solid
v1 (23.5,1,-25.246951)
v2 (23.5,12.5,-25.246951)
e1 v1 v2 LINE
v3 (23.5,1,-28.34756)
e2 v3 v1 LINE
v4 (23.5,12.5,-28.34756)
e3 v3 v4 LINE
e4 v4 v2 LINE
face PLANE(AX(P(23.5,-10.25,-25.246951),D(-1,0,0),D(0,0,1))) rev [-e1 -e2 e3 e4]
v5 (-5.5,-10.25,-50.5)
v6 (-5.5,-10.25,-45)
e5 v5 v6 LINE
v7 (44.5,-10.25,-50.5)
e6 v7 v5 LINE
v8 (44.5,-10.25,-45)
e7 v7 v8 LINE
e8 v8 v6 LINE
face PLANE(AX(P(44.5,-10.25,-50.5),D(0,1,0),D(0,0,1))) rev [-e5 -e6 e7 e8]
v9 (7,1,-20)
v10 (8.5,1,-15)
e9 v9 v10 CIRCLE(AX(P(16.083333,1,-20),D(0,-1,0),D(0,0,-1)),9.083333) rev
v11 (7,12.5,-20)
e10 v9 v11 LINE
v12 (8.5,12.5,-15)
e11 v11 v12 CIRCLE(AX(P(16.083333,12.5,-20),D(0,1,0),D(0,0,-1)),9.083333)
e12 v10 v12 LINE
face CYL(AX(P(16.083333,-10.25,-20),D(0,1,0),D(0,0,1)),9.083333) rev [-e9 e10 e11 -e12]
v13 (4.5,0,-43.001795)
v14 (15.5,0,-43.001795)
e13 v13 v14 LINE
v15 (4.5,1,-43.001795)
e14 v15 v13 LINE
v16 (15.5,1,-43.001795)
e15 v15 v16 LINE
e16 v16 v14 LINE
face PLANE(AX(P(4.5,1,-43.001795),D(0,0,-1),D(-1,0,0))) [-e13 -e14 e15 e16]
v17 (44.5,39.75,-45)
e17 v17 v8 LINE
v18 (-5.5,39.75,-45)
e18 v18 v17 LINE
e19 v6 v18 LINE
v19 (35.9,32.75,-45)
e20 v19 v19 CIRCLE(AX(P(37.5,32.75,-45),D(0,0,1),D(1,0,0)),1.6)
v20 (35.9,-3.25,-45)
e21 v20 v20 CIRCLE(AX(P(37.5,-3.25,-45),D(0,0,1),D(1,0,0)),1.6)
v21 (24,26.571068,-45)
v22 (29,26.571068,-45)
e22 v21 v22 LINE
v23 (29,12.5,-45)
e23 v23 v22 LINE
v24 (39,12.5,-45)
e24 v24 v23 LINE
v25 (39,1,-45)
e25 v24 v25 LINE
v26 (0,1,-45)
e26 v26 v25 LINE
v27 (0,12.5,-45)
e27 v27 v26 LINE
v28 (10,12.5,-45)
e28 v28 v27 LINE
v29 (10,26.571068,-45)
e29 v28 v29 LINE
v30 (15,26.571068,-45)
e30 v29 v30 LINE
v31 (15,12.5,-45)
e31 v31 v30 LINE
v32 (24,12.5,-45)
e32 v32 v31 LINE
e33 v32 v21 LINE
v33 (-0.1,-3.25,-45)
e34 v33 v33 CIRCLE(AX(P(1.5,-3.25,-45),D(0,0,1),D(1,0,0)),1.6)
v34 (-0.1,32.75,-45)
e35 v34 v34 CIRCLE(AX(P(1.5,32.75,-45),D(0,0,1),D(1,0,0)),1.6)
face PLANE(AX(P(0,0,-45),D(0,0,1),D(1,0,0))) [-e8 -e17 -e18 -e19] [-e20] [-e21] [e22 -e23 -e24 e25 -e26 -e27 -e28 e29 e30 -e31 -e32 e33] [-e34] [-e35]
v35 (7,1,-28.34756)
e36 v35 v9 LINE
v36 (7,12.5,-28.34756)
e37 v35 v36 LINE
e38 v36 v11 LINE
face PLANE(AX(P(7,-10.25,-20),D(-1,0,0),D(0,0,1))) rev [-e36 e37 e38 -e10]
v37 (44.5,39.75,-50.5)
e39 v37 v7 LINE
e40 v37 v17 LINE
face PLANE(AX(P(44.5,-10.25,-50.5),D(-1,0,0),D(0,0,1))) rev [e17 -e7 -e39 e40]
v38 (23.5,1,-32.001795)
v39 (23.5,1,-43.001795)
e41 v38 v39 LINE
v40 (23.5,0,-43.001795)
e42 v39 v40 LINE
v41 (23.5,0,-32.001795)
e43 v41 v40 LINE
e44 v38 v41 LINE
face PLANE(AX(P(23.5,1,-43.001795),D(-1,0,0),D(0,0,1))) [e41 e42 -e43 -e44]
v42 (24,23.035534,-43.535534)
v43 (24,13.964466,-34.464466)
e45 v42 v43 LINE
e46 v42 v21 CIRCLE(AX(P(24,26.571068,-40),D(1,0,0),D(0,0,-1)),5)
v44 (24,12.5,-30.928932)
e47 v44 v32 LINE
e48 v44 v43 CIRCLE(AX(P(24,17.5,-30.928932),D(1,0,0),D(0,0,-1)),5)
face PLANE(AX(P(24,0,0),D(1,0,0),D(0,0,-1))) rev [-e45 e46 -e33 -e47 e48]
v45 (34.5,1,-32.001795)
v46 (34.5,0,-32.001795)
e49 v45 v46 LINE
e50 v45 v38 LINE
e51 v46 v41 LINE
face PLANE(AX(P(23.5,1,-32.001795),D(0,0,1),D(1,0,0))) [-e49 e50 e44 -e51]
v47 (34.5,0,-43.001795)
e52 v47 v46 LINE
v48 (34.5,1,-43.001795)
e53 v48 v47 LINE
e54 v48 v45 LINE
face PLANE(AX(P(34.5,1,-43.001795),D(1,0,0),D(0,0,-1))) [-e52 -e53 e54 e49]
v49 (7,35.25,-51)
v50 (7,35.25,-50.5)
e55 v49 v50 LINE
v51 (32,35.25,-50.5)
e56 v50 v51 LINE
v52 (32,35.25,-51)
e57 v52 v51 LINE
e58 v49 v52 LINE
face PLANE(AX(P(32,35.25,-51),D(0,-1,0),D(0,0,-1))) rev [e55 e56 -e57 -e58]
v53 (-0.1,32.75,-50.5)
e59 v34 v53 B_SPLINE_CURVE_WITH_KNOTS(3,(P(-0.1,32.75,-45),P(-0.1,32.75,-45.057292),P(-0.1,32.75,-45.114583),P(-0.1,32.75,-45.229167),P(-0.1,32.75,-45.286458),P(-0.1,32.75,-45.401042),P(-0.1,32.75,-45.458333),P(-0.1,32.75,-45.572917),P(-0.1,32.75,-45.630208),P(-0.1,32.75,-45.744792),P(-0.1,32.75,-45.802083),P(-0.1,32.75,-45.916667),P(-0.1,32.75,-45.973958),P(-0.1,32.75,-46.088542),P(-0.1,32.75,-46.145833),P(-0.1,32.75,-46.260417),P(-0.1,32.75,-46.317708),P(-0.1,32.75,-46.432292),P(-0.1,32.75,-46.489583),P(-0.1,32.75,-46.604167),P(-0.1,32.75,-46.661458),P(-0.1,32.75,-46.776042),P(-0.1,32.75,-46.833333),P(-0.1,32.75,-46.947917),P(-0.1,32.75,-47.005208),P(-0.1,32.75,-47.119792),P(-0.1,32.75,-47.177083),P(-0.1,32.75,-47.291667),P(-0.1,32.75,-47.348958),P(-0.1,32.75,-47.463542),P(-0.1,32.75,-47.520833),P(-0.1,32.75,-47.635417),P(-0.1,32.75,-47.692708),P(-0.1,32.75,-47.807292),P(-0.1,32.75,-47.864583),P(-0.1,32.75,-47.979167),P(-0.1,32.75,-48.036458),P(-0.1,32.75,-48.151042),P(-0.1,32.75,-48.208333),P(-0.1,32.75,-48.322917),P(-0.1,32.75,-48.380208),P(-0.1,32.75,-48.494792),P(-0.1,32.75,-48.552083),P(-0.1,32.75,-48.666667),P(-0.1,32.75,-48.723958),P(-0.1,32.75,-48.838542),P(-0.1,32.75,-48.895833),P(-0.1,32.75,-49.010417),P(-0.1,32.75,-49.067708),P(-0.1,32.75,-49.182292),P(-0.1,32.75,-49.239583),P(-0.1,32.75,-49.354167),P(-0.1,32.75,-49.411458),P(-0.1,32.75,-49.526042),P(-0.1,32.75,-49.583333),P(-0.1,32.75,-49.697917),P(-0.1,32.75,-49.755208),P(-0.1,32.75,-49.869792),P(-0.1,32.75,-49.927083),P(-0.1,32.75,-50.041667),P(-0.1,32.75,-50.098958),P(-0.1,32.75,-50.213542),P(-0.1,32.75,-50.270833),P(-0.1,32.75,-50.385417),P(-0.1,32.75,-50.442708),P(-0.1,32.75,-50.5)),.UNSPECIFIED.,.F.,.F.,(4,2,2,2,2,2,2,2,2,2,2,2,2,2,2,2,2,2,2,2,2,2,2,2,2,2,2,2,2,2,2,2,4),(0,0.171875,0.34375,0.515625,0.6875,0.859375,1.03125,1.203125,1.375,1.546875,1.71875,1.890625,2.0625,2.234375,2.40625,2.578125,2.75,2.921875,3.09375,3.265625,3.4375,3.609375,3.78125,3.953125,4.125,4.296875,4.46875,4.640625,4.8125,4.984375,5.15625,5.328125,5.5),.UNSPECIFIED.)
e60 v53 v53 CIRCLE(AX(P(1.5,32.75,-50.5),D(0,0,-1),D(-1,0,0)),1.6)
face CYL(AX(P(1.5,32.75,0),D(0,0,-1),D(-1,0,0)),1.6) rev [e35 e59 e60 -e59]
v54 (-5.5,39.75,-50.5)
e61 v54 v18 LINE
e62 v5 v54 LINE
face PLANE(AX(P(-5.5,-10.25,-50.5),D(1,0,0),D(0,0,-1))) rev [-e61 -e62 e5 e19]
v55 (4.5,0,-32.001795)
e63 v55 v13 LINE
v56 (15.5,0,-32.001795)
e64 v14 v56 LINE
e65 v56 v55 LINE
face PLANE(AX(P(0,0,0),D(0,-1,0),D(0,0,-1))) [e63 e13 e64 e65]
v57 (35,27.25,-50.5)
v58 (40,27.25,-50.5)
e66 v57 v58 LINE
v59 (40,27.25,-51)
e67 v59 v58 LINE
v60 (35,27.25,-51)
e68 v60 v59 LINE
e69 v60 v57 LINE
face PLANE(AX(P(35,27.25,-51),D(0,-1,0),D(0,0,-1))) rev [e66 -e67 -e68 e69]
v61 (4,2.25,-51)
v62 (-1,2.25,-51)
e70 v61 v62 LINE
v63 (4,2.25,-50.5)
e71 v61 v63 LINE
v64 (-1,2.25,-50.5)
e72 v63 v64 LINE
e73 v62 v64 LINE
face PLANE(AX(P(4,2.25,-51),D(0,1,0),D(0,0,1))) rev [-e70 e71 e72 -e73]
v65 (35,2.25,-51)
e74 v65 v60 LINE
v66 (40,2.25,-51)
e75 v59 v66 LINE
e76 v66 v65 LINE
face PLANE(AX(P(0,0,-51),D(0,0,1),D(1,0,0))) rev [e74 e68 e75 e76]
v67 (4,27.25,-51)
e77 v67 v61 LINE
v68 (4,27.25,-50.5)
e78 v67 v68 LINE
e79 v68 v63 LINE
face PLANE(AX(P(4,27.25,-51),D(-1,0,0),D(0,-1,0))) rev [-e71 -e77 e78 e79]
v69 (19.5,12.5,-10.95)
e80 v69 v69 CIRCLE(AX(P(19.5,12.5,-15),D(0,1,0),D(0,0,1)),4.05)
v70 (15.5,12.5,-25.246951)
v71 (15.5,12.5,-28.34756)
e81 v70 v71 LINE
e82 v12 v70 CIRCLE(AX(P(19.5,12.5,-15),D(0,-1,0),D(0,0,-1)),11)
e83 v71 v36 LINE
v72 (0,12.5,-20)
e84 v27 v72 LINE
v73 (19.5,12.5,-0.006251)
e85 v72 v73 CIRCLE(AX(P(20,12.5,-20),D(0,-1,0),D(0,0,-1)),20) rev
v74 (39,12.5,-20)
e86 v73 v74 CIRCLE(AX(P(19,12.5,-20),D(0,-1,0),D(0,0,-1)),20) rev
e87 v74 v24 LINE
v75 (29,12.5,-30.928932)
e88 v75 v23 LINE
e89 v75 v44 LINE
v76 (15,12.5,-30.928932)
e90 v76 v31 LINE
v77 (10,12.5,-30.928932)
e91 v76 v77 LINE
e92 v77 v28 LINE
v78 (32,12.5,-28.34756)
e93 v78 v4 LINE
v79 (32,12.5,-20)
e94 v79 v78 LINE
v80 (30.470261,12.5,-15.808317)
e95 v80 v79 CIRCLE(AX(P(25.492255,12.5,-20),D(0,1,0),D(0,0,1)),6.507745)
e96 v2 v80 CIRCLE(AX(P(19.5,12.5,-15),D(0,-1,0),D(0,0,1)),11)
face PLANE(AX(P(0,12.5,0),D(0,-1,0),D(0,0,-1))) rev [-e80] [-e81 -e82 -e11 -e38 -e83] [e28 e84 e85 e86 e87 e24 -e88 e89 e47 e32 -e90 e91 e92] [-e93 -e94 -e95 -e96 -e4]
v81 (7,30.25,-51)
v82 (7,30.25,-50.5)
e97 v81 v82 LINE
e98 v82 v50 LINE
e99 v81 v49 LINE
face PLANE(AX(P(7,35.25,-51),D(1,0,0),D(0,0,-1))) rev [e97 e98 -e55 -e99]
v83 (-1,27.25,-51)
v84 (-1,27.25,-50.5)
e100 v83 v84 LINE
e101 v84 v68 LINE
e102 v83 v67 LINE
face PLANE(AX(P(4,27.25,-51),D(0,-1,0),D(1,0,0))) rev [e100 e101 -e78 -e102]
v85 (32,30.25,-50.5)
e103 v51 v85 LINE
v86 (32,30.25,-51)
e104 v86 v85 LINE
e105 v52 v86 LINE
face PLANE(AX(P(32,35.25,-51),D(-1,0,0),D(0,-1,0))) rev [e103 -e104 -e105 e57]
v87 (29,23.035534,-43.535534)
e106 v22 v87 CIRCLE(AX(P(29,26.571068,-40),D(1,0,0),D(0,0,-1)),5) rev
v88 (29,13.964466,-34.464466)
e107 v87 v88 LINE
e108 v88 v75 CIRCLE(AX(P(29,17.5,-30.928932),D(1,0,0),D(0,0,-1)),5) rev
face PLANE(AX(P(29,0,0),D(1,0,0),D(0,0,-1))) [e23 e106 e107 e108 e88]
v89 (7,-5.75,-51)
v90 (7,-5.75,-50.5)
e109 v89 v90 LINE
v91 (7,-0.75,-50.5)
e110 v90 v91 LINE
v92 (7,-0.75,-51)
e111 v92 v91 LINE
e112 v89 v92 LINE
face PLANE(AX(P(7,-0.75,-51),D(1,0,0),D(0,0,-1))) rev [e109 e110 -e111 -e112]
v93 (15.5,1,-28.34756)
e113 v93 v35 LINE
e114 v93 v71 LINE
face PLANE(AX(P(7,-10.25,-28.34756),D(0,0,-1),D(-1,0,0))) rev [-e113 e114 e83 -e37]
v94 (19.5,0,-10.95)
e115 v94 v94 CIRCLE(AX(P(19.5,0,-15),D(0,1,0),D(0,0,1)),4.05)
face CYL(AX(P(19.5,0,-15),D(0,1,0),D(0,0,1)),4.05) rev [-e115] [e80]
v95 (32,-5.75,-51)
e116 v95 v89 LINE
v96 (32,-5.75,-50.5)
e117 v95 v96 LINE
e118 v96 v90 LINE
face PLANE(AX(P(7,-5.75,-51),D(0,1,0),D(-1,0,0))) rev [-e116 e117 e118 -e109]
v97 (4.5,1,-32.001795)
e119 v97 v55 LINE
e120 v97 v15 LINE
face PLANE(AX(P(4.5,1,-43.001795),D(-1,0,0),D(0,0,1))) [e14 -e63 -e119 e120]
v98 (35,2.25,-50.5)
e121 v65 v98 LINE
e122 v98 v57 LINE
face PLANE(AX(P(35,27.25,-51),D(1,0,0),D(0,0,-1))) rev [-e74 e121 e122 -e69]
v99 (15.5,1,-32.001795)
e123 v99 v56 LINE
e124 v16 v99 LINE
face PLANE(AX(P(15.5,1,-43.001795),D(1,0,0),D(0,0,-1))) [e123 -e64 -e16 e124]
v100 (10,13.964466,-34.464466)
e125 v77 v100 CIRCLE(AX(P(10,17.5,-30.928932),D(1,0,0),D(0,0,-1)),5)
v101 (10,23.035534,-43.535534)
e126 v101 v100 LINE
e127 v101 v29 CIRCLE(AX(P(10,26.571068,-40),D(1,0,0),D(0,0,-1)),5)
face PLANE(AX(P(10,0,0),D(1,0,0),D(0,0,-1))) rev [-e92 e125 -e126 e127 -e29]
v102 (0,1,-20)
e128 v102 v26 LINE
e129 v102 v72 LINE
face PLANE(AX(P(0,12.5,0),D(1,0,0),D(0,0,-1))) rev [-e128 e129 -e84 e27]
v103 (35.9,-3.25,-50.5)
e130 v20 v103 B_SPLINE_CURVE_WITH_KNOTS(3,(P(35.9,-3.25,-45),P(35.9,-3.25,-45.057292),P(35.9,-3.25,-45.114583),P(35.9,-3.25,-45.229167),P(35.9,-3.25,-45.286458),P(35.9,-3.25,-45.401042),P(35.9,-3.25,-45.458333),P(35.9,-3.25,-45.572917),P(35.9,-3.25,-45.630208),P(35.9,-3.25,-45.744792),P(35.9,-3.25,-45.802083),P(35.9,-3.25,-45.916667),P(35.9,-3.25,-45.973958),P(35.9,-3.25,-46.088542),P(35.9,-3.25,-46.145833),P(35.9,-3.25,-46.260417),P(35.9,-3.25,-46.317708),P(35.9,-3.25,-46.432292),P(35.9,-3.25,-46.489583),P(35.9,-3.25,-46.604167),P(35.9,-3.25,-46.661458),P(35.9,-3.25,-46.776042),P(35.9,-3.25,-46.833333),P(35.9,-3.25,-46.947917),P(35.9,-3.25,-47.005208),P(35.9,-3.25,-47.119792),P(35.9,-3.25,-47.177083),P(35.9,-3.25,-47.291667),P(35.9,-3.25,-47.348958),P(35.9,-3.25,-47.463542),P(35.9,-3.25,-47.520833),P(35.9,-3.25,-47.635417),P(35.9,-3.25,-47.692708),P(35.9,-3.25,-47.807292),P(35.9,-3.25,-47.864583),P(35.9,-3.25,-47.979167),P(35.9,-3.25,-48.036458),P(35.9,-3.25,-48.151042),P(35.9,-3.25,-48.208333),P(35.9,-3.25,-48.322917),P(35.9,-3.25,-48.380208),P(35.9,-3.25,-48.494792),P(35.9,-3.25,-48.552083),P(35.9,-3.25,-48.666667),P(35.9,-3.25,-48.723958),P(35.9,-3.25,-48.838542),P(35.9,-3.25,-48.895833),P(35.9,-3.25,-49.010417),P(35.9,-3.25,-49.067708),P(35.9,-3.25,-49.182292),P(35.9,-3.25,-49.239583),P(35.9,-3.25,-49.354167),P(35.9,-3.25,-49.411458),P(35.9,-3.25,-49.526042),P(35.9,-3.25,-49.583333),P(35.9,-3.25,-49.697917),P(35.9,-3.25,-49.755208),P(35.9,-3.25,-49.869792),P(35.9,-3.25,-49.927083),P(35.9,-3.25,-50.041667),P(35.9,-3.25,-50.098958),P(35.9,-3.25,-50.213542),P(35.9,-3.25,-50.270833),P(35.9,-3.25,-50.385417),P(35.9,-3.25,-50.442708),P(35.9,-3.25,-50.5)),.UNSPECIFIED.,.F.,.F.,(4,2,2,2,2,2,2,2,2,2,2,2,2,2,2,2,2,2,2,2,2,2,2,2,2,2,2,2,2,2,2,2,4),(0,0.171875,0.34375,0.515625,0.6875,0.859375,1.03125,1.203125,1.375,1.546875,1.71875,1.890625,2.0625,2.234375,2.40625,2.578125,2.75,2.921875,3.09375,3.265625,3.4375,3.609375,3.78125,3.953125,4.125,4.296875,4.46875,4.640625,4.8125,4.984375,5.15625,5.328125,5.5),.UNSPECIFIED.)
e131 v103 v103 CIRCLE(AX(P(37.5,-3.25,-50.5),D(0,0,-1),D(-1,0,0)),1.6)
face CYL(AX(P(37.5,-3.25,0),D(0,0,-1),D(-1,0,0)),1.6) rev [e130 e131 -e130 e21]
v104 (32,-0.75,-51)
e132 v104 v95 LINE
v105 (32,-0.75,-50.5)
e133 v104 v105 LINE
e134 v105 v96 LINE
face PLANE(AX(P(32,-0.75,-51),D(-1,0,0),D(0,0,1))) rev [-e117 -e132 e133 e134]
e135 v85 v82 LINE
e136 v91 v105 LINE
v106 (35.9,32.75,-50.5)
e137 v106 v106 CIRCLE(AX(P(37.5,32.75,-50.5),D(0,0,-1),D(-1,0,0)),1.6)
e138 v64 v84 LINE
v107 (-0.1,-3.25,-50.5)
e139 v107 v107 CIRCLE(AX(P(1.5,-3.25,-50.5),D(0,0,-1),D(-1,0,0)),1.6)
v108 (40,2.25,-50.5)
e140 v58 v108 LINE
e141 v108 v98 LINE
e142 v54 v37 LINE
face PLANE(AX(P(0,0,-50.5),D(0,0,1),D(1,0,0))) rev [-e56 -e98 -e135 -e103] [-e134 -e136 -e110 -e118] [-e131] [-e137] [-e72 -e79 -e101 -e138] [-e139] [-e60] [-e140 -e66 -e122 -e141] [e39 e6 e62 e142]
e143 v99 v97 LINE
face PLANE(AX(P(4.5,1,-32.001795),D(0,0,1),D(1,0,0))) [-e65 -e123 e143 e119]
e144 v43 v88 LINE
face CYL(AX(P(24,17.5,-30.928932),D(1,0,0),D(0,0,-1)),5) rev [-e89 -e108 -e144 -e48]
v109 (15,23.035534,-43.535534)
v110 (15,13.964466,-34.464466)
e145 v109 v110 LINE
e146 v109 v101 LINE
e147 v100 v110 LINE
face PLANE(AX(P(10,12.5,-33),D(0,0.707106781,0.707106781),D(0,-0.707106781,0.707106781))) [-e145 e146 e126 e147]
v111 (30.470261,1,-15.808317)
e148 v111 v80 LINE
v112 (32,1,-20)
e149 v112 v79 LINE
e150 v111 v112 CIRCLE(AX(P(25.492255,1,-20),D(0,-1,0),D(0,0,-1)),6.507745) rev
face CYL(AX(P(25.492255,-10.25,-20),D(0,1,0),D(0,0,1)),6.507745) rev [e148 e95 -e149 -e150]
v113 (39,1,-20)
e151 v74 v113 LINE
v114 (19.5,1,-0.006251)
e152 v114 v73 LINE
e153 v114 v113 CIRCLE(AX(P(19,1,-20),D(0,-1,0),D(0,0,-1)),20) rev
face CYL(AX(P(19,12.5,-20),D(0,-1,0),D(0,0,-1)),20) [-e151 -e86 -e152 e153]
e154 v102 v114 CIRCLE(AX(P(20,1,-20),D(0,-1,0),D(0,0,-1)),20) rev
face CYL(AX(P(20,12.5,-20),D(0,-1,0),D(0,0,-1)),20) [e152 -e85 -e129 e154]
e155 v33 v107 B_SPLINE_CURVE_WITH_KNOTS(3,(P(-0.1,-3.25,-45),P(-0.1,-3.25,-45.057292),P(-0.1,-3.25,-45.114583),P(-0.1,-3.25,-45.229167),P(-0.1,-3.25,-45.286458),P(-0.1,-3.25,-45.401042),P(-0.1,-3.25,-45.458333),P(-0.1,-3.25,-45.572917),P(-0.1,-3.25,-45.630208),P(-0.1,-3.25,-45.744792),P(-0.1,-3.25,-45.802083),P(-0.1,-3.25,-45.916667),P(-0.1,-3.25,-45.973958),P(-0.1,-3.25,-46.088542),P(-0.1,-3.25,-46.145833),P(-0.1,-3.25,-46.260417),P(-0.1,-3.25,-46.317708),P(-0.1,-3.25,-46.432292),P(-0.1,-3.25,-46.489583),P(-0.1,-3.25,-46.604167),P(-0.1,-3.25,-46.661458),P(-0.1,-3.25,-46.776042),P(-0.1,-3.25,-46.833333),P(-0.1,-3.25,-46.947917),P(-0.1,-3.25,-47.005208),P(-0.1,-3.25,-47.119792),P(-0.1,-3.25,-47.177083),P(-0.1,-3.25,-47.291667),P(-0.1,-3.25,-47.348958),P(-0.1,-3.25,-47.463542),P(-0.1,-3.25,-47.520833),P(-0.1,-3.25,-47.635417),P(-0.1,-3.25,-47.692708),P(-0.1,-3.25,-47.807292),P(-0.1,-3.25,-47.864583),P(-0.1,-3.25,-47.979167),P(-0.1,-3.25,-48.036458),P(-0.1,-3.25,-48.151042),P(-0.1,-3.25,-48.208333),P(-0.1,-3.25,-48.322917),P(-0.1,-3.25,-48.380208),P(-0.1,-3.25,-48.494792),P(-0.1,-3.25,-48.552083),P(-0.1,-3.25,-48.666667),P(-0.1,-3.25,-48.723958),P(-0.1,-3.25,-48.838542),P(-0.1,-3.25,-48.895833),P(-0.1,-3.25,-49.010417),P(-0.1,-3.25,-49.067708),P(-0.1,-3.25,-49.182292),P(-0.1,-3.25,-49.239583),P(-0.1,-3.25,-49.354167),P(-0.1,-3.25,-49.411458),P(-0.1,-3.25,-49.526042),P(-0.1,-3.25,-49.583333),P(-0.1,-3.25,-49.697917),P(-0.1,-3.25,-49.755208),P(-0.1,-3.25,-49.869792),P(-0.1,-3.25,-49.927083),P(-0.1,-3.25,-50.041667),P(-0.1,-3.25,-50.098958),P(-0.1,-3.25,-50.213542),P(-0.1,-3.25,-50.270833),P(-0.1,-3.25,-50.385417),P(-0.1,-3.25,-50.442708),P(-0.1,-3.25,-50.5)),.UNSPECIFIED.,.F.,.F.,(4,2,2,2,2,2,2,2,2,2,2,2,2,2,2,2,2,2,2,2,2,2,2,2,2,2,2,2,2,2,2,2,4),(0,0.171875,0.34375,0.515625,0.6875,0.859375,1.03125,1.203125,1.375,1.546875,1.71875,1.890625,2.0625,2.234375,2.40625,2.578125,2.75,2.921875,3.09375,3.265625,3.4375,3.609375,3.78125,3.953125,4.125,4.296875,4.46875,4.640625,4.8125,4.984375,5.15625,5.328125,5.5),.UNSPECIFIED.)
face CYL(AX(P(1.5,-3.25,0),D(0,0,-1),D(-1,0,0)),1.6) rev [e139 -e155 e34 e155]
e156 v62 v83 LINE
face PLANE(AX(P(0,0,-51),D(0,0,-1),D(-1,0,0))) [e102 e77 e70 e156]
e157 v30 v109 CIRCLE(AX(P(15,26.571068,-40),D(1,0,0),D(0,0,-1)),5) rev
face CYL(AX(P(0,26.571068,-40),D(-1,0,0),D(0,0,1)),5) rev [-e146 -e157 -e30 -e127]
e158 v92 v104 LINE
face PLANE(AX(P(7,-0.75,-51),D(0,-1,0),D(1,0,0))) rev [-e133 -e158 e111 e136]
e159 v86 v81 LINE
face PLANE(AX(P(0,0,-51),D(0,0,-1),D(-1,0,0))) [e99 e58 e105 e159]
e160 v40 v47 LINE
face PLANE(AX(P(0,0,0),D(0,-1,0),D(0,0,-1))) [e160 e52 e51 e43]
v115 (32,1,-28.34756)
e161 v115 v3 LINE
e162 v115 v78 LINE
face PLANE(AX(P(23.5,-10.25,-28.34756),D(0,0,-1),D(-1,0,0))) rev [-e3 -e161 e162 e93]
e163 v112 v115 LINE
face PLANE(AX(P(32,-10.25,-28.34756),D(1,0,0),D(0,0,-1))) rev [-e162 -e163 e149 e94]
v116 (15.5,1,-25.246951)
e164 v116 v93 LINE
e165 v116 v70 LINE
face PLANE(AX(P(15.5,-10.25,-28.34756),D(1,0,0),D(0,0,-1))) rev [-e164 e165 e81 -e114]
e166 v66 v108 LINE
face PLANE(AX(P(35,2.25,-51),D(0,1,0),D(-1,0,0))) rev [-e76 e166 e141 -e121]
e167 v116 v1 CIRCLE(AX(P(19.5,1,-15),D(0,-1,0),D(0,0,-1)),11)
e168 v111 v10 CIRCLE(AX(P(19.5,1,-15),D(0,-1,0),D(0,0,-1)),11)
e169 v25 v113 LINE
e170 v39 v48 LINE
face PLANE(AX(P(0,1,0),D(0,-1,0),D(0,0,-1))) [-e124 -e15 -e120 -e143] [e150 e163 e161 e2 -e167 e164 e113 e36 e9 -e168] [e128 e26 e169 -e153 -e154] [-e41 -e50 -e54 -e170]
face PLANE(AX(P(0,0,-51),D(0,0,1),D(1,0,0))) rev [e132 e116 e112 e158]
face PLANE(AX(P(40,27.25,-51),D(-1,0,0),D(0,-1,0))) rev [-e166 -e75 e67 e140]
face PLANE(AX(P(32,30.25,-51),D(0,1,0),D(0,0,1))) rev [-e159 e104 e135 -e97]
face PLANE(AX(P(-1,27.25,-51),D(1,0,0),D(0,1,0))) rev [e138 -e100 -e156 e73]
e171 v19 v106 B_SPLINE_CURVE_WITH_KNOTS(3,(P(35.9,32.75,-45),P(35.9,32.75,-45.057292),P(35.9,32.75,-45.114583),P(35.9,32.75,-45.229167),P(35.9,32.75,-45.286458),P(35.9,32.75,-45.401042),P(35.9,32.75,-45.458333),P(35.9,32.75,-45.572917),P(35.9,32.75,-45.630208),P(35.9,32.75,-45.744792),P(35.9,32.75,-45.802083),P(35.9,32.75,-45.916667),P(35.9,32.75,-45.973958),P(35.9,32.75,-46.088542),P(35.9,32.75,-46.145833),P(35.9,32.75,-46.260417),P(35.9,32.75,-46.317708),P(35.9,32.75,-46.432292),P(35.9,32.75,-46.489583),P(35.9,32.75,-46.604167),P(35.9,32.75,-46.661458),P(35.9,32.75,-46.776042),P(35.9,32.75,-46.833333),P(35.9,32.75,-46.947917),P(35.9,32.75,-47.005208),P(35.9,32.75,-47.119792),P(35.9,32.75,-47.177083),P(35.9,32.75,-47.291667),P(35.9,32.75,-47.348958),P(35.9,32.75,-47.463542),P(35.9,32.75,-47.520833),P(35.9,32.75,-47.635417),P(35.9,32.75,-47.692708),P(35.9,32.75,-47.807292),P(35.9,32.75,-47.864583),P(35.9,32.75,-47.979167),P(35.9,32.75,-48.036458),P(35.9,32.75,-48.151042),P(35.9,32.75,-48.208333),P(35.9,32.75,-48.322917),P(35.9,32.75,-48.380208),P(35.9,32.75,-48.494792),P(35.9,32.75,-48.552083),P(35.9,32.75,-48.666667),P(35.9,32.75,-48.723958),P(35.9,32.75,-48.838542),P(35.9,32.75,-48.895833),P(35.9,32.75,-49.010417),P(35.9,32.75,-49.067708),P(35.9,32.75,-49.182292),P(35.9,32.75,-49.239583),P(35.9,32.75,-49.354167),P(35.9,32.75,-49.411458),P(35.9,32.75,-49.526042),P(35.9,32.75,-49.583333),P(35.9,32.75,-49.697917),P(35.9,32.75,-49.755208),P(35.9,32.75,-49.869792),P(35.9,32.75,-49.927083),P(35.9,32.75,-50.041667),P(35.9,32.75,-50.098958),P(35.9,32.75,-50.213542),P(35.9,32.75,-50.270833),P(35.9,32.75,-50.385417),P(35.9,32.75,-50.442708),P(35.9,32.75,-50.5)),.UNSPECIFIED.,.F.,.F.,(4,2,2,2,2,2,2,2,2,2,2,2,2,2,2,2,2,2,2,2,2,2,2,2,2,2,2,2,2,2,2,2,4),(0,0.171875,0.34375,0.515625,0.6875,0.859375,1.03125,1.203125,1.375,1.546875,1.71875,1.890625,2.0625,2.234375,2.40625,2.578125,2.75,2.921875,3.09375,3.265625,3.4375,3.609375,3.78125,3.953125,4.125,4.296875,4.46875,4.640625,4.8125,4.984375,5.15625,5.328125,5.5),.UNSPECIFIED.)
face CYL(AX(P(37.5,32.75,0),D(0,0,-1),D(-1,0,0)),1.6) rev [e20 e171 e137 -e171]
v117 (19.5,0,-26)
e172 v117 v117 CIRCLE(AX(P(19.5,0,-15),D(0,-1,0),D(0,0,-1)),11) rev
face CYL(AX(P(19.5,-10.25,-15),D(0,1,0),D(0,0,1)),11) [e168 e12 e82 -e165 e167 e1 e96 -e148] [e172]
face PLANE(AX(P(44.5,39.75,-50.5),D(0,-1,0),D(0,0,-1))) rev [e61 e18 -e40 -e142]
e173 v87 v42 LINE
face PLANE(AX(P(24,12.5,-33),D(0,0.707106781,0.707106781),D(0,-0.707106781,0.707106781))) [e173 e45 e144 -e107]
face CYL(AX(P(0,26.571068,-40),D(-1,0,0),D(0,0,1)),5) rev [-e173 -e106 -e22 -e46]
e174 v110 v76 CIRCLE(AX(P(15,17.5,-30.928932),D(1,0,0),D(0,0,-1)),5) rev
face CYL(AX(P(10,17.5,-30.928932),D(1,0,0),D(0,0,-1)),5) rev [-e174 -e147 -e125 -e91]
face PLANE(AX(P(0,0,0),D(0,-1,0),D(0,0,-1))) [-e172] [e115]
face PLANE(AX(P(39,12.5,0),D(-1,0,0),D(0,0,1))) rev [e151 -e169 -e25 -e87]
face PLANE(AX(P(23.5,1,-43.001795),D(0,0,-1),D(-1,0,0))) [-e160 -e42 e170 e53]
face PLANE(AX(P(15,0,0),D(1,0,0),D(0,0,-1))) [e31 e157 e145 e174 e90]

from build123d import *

# Parameters (mm, degrees)
SKETCH1_W           = 39
SKETCH1_H           = 45
BOSS_EXTRUDE1_DEPTH = 12.5
SKETCH2_R           = 4.05
CUT_EXTRUDE1_DEPTH  = 61.846117378
SKETCH3_W           = 50
SKETCH3_H           = 50
BOSS_EXTRUDE2_DEPTH = 5.5
BOSS_EXTRUDE3_START = -10
BOSS_EXTRUDE3_DEPTH = 5
LPATTERN1_COUNT     = 2
LPATTERN1_PITCH     = 14
FILLET1_R           = 5
SKETCH5_R           = 1.6
CUT_EXTRUDE2_DEPTH  = 79.17008699
FILLET2_R           = 20
CUT_EXTRUDE3_DEPTH  = 73.615855707
CUT_EXTRUDE4_START  = -1
SKETCH7_W           = 39.2
SKETCH7_H           = 50.063664736
SKETCH7_R           = 11
SKETCH7_W_2         = 11
SKETCH7_H_2         = 11
CUT_EXTRUDE4_DEPTH  = 1
SKETCH8_W           = 25
SKETCH8_H           = 5
SKETCH8_W_2         = 5
SKETCH8_H_2         = 25
BOSS_EXTRUDE4_DEPTH = 0.5


with BuildPart() as part:
    # Sketch1 → Boss-Extrude1 (new body)
    with BuildSketch(Plane(origin=(0, 0, 0), x_dir=(1, 0, 0), z_dir=(0, 1, 0))):
        with Locations((19.5, 22.5)):
            Rectangle(SKETCH1_W, SKETCH1_H)
    extrude(amount=BOSS_EXTRUDE1_DEPTH)

    # Sketch2 → Cut-Extrude1 (cut, through all)
    with BuildSketch(Plane(origin=(0, 12.5, 0), x_dir=(1, 0, 0), z_dir=(0, 1, 0))):
        with Locations(Location((19.5, 15, 0), (0, 0, 270))):
            Circle(SKETCH2_R)
    extrude(amount=-CUT_EXTRUDE1_DEPTH, mode=Mode.SUBTRACT)

    # Sketch3 → Boss-Extrude2 (add)
    with BuildSketch(Plane(origin=(0, 0, -45), x_dir=(-1, 0, 0), z_dir=(0, 0, -1))):
        with Locations((-19.5, 14.75)):
            Rectangle(SKETCH3_W, SKETCH3_H)
    extrude(amount=BOSS_EXTRUDE2_DEPTH)

    # Sketch4 → Boss-Extrude3 (add)
    with BuildSketch(Plane(origin=(39, 0, 0), x_dir=(0, 0, -1), z_dir=(1, 0, 0)).offset(BOSS_EXTRUDE3_START)):
        Polygon((33, 12.5), (45, 24.5), (45, 12.5), align=None)
    boss_extrude3 = extrude(amount=-BOSS_EXTRUDE3_DEPTH)

    # LPattern1: Boss-Extrude3 ×2
    with Locations(*[(-i * LPATTERN1_PITCH, 0, 0) for i in range(1, LPATTERN1_COUNT)]):
        add(boss_extrude3)

    # Fillet1
    fillet1_edges = [part.edges().sort_by_distance(p)[0] for p in [
        (26.5, 12.5, -33),
        (26.5, 24.5, -45),
        (12.5, 12.5, -33),
        (12.5, 24.5, -45),
    ]]
    fillet(fillet1_edges, radius=FILLET1_R)

    # Sketch5 → Cut-Extrude2 (cut, through all)
    with BuildSketch(Plane(origin=(0, 0, -50.5), x_dir=(-1, 0, 0), z_dir=(0, 0, -1))):
        with Locations((-37.5, 32.75)):
            Circle(SKETCH5_R)
        with Locations((-1.5, 32.75)):
            Circle(SKETCH5_R)
        with Locations((-1.5, -3.25)):
            Circle(SKETCH5_R)
        with Locations((-37.5, -3.25)):
            Circle(SKETCH5_R)
    extrude(amount=-CUT_EXTRUDE2_DEPTH, mode=Mode.SUBTRACT)

    # Fillet2
    # the kernel refuses this fillet: 20 mm, written as the material it takes off along each edge
    with BuildSketch(Plane(origin=(0, -50, 0), x_dir=(0, 0, -1), z_dir=(0, 1, 0))) as fillet2_piece_1:
        with BuildLine():
            CenterArc((FILLET2_R, -FILLET2_R), FILLET2_R, 90, 90)
            Line((0, -FILLET2_R), (0, 0))
            Line((0, 0), (FILLET2_R, 0))
        make_face()
    extrude(amount=112.5, mode=Mode.SUBTRACT)
    with BuildSketch(Plane(origin=(39, -50, 0), x_dir=(0, 0, -1), z_dir=(0, 1, 0))) as fillet2_piece_2:
        with BuildLine():
            CenterArc((FILLET2_R, FILLET2_R), FILLET2_R, 180, 90)
            Line((0, FILLET2_R), (0, 0))
            Line((0, 0), (FILLET2_R, 0))
        make_face()
    extrude(amount=112.5, mode=Mode.SUBTRACT)

    # Sketch6 → Cut-Extrude3 (cut, through all)
    with BuildSketch(Plane(origin=(0, 12.5, 0), x_dir=(1, 0, 0), z_dir=(0, 1, 0))):
        with BuildLine():
            Line((7, 20), (7, 28.347560338))
            Line((7, 28.347560338), (15.5, 28.347560338))
            Line((15.5, 28.347560338), (15.5, 25.246950766))
            ThreePointArc((15.5, 25.246950766), (10.417048938, 21.204836823), (8.5, 15))
            ThreePointArc((8.5, 15), (7.383077909, 17.389923373), (7, 20))
        make_face()
        with BuildLine():
            Line((23.5, 25.246950766), (23.5, 28.347560338))
            Line((23.5, 28.347560338), (32, 28.347560338))
            Line((32, 28.347560338), (32, 20))
            ThreePointArc((32, 20), (31.605614865, 17.768951725), (30.47026085, 15.808317311))
            ThreePointArc((30.47026085, 15.808317311), (28.348679441, 21.534590434), (23.5, 25.246950766))
        make_face()
    extrude(amount=-CUT_EXTRUDE3_DEPTH, mode=Mode.SUBTRACT)

    # Sketch7 → Cut-Extrude4 (cut)
    with BuildSketch(Plane.XZ.offset(CUT_EXTRUDE4_START)):
        with Locations((19.5, -19.968167632)):
            Rectangle(SKETCH7_W, SKETCH7_H)
        with Locations(Location((19.5, -15, 0), (0, 0, 180))):
            Circle(SKETCH7_R, mode=Mode.SUBTRACT)
        with Locations((10, -37.501795484)):
            Rectangle(SKETCH7_W_2, SKETCH7_H_2, mode=Mode.SUBTRACT)
        with Locations((29, -37.501795484)):
            Rectangle(SKETCH7_W_2, SKETCH7_H_2, mode=Mode.SUBTRACT)
    extrude(amount=CUT_EXTRUDE4_DEPTH, mode=Mode.SUBTRACT)

    # Sketch8 → Boss-Extrude4 (add)
    with BuildSketch(Plane(origin=(0, 0, -50.5), x_dir=(-1, 0, 0), z_dir=(0, 0, -1))):
        with Locations((-19.5, 32.75)):
            Rectangle(SKETCH8_W, SKETCH8_H)
        with Locations((-1.5, 14.75)):
            Rectangle(SKETCH8_W_2, SKETCH8_H_2)
        with Locations((-19.5, -3.25)):
            Rectangle(SKETCH8_W, SKETCH8_H)
        with Locations((-37.5, 14.75)):
            Rectangle(SKETCH8_W_2, SKETCH8_H_2)
    extrude(amount=BOSS_EXTRUDE4_DEPTH)


solid = part.part
